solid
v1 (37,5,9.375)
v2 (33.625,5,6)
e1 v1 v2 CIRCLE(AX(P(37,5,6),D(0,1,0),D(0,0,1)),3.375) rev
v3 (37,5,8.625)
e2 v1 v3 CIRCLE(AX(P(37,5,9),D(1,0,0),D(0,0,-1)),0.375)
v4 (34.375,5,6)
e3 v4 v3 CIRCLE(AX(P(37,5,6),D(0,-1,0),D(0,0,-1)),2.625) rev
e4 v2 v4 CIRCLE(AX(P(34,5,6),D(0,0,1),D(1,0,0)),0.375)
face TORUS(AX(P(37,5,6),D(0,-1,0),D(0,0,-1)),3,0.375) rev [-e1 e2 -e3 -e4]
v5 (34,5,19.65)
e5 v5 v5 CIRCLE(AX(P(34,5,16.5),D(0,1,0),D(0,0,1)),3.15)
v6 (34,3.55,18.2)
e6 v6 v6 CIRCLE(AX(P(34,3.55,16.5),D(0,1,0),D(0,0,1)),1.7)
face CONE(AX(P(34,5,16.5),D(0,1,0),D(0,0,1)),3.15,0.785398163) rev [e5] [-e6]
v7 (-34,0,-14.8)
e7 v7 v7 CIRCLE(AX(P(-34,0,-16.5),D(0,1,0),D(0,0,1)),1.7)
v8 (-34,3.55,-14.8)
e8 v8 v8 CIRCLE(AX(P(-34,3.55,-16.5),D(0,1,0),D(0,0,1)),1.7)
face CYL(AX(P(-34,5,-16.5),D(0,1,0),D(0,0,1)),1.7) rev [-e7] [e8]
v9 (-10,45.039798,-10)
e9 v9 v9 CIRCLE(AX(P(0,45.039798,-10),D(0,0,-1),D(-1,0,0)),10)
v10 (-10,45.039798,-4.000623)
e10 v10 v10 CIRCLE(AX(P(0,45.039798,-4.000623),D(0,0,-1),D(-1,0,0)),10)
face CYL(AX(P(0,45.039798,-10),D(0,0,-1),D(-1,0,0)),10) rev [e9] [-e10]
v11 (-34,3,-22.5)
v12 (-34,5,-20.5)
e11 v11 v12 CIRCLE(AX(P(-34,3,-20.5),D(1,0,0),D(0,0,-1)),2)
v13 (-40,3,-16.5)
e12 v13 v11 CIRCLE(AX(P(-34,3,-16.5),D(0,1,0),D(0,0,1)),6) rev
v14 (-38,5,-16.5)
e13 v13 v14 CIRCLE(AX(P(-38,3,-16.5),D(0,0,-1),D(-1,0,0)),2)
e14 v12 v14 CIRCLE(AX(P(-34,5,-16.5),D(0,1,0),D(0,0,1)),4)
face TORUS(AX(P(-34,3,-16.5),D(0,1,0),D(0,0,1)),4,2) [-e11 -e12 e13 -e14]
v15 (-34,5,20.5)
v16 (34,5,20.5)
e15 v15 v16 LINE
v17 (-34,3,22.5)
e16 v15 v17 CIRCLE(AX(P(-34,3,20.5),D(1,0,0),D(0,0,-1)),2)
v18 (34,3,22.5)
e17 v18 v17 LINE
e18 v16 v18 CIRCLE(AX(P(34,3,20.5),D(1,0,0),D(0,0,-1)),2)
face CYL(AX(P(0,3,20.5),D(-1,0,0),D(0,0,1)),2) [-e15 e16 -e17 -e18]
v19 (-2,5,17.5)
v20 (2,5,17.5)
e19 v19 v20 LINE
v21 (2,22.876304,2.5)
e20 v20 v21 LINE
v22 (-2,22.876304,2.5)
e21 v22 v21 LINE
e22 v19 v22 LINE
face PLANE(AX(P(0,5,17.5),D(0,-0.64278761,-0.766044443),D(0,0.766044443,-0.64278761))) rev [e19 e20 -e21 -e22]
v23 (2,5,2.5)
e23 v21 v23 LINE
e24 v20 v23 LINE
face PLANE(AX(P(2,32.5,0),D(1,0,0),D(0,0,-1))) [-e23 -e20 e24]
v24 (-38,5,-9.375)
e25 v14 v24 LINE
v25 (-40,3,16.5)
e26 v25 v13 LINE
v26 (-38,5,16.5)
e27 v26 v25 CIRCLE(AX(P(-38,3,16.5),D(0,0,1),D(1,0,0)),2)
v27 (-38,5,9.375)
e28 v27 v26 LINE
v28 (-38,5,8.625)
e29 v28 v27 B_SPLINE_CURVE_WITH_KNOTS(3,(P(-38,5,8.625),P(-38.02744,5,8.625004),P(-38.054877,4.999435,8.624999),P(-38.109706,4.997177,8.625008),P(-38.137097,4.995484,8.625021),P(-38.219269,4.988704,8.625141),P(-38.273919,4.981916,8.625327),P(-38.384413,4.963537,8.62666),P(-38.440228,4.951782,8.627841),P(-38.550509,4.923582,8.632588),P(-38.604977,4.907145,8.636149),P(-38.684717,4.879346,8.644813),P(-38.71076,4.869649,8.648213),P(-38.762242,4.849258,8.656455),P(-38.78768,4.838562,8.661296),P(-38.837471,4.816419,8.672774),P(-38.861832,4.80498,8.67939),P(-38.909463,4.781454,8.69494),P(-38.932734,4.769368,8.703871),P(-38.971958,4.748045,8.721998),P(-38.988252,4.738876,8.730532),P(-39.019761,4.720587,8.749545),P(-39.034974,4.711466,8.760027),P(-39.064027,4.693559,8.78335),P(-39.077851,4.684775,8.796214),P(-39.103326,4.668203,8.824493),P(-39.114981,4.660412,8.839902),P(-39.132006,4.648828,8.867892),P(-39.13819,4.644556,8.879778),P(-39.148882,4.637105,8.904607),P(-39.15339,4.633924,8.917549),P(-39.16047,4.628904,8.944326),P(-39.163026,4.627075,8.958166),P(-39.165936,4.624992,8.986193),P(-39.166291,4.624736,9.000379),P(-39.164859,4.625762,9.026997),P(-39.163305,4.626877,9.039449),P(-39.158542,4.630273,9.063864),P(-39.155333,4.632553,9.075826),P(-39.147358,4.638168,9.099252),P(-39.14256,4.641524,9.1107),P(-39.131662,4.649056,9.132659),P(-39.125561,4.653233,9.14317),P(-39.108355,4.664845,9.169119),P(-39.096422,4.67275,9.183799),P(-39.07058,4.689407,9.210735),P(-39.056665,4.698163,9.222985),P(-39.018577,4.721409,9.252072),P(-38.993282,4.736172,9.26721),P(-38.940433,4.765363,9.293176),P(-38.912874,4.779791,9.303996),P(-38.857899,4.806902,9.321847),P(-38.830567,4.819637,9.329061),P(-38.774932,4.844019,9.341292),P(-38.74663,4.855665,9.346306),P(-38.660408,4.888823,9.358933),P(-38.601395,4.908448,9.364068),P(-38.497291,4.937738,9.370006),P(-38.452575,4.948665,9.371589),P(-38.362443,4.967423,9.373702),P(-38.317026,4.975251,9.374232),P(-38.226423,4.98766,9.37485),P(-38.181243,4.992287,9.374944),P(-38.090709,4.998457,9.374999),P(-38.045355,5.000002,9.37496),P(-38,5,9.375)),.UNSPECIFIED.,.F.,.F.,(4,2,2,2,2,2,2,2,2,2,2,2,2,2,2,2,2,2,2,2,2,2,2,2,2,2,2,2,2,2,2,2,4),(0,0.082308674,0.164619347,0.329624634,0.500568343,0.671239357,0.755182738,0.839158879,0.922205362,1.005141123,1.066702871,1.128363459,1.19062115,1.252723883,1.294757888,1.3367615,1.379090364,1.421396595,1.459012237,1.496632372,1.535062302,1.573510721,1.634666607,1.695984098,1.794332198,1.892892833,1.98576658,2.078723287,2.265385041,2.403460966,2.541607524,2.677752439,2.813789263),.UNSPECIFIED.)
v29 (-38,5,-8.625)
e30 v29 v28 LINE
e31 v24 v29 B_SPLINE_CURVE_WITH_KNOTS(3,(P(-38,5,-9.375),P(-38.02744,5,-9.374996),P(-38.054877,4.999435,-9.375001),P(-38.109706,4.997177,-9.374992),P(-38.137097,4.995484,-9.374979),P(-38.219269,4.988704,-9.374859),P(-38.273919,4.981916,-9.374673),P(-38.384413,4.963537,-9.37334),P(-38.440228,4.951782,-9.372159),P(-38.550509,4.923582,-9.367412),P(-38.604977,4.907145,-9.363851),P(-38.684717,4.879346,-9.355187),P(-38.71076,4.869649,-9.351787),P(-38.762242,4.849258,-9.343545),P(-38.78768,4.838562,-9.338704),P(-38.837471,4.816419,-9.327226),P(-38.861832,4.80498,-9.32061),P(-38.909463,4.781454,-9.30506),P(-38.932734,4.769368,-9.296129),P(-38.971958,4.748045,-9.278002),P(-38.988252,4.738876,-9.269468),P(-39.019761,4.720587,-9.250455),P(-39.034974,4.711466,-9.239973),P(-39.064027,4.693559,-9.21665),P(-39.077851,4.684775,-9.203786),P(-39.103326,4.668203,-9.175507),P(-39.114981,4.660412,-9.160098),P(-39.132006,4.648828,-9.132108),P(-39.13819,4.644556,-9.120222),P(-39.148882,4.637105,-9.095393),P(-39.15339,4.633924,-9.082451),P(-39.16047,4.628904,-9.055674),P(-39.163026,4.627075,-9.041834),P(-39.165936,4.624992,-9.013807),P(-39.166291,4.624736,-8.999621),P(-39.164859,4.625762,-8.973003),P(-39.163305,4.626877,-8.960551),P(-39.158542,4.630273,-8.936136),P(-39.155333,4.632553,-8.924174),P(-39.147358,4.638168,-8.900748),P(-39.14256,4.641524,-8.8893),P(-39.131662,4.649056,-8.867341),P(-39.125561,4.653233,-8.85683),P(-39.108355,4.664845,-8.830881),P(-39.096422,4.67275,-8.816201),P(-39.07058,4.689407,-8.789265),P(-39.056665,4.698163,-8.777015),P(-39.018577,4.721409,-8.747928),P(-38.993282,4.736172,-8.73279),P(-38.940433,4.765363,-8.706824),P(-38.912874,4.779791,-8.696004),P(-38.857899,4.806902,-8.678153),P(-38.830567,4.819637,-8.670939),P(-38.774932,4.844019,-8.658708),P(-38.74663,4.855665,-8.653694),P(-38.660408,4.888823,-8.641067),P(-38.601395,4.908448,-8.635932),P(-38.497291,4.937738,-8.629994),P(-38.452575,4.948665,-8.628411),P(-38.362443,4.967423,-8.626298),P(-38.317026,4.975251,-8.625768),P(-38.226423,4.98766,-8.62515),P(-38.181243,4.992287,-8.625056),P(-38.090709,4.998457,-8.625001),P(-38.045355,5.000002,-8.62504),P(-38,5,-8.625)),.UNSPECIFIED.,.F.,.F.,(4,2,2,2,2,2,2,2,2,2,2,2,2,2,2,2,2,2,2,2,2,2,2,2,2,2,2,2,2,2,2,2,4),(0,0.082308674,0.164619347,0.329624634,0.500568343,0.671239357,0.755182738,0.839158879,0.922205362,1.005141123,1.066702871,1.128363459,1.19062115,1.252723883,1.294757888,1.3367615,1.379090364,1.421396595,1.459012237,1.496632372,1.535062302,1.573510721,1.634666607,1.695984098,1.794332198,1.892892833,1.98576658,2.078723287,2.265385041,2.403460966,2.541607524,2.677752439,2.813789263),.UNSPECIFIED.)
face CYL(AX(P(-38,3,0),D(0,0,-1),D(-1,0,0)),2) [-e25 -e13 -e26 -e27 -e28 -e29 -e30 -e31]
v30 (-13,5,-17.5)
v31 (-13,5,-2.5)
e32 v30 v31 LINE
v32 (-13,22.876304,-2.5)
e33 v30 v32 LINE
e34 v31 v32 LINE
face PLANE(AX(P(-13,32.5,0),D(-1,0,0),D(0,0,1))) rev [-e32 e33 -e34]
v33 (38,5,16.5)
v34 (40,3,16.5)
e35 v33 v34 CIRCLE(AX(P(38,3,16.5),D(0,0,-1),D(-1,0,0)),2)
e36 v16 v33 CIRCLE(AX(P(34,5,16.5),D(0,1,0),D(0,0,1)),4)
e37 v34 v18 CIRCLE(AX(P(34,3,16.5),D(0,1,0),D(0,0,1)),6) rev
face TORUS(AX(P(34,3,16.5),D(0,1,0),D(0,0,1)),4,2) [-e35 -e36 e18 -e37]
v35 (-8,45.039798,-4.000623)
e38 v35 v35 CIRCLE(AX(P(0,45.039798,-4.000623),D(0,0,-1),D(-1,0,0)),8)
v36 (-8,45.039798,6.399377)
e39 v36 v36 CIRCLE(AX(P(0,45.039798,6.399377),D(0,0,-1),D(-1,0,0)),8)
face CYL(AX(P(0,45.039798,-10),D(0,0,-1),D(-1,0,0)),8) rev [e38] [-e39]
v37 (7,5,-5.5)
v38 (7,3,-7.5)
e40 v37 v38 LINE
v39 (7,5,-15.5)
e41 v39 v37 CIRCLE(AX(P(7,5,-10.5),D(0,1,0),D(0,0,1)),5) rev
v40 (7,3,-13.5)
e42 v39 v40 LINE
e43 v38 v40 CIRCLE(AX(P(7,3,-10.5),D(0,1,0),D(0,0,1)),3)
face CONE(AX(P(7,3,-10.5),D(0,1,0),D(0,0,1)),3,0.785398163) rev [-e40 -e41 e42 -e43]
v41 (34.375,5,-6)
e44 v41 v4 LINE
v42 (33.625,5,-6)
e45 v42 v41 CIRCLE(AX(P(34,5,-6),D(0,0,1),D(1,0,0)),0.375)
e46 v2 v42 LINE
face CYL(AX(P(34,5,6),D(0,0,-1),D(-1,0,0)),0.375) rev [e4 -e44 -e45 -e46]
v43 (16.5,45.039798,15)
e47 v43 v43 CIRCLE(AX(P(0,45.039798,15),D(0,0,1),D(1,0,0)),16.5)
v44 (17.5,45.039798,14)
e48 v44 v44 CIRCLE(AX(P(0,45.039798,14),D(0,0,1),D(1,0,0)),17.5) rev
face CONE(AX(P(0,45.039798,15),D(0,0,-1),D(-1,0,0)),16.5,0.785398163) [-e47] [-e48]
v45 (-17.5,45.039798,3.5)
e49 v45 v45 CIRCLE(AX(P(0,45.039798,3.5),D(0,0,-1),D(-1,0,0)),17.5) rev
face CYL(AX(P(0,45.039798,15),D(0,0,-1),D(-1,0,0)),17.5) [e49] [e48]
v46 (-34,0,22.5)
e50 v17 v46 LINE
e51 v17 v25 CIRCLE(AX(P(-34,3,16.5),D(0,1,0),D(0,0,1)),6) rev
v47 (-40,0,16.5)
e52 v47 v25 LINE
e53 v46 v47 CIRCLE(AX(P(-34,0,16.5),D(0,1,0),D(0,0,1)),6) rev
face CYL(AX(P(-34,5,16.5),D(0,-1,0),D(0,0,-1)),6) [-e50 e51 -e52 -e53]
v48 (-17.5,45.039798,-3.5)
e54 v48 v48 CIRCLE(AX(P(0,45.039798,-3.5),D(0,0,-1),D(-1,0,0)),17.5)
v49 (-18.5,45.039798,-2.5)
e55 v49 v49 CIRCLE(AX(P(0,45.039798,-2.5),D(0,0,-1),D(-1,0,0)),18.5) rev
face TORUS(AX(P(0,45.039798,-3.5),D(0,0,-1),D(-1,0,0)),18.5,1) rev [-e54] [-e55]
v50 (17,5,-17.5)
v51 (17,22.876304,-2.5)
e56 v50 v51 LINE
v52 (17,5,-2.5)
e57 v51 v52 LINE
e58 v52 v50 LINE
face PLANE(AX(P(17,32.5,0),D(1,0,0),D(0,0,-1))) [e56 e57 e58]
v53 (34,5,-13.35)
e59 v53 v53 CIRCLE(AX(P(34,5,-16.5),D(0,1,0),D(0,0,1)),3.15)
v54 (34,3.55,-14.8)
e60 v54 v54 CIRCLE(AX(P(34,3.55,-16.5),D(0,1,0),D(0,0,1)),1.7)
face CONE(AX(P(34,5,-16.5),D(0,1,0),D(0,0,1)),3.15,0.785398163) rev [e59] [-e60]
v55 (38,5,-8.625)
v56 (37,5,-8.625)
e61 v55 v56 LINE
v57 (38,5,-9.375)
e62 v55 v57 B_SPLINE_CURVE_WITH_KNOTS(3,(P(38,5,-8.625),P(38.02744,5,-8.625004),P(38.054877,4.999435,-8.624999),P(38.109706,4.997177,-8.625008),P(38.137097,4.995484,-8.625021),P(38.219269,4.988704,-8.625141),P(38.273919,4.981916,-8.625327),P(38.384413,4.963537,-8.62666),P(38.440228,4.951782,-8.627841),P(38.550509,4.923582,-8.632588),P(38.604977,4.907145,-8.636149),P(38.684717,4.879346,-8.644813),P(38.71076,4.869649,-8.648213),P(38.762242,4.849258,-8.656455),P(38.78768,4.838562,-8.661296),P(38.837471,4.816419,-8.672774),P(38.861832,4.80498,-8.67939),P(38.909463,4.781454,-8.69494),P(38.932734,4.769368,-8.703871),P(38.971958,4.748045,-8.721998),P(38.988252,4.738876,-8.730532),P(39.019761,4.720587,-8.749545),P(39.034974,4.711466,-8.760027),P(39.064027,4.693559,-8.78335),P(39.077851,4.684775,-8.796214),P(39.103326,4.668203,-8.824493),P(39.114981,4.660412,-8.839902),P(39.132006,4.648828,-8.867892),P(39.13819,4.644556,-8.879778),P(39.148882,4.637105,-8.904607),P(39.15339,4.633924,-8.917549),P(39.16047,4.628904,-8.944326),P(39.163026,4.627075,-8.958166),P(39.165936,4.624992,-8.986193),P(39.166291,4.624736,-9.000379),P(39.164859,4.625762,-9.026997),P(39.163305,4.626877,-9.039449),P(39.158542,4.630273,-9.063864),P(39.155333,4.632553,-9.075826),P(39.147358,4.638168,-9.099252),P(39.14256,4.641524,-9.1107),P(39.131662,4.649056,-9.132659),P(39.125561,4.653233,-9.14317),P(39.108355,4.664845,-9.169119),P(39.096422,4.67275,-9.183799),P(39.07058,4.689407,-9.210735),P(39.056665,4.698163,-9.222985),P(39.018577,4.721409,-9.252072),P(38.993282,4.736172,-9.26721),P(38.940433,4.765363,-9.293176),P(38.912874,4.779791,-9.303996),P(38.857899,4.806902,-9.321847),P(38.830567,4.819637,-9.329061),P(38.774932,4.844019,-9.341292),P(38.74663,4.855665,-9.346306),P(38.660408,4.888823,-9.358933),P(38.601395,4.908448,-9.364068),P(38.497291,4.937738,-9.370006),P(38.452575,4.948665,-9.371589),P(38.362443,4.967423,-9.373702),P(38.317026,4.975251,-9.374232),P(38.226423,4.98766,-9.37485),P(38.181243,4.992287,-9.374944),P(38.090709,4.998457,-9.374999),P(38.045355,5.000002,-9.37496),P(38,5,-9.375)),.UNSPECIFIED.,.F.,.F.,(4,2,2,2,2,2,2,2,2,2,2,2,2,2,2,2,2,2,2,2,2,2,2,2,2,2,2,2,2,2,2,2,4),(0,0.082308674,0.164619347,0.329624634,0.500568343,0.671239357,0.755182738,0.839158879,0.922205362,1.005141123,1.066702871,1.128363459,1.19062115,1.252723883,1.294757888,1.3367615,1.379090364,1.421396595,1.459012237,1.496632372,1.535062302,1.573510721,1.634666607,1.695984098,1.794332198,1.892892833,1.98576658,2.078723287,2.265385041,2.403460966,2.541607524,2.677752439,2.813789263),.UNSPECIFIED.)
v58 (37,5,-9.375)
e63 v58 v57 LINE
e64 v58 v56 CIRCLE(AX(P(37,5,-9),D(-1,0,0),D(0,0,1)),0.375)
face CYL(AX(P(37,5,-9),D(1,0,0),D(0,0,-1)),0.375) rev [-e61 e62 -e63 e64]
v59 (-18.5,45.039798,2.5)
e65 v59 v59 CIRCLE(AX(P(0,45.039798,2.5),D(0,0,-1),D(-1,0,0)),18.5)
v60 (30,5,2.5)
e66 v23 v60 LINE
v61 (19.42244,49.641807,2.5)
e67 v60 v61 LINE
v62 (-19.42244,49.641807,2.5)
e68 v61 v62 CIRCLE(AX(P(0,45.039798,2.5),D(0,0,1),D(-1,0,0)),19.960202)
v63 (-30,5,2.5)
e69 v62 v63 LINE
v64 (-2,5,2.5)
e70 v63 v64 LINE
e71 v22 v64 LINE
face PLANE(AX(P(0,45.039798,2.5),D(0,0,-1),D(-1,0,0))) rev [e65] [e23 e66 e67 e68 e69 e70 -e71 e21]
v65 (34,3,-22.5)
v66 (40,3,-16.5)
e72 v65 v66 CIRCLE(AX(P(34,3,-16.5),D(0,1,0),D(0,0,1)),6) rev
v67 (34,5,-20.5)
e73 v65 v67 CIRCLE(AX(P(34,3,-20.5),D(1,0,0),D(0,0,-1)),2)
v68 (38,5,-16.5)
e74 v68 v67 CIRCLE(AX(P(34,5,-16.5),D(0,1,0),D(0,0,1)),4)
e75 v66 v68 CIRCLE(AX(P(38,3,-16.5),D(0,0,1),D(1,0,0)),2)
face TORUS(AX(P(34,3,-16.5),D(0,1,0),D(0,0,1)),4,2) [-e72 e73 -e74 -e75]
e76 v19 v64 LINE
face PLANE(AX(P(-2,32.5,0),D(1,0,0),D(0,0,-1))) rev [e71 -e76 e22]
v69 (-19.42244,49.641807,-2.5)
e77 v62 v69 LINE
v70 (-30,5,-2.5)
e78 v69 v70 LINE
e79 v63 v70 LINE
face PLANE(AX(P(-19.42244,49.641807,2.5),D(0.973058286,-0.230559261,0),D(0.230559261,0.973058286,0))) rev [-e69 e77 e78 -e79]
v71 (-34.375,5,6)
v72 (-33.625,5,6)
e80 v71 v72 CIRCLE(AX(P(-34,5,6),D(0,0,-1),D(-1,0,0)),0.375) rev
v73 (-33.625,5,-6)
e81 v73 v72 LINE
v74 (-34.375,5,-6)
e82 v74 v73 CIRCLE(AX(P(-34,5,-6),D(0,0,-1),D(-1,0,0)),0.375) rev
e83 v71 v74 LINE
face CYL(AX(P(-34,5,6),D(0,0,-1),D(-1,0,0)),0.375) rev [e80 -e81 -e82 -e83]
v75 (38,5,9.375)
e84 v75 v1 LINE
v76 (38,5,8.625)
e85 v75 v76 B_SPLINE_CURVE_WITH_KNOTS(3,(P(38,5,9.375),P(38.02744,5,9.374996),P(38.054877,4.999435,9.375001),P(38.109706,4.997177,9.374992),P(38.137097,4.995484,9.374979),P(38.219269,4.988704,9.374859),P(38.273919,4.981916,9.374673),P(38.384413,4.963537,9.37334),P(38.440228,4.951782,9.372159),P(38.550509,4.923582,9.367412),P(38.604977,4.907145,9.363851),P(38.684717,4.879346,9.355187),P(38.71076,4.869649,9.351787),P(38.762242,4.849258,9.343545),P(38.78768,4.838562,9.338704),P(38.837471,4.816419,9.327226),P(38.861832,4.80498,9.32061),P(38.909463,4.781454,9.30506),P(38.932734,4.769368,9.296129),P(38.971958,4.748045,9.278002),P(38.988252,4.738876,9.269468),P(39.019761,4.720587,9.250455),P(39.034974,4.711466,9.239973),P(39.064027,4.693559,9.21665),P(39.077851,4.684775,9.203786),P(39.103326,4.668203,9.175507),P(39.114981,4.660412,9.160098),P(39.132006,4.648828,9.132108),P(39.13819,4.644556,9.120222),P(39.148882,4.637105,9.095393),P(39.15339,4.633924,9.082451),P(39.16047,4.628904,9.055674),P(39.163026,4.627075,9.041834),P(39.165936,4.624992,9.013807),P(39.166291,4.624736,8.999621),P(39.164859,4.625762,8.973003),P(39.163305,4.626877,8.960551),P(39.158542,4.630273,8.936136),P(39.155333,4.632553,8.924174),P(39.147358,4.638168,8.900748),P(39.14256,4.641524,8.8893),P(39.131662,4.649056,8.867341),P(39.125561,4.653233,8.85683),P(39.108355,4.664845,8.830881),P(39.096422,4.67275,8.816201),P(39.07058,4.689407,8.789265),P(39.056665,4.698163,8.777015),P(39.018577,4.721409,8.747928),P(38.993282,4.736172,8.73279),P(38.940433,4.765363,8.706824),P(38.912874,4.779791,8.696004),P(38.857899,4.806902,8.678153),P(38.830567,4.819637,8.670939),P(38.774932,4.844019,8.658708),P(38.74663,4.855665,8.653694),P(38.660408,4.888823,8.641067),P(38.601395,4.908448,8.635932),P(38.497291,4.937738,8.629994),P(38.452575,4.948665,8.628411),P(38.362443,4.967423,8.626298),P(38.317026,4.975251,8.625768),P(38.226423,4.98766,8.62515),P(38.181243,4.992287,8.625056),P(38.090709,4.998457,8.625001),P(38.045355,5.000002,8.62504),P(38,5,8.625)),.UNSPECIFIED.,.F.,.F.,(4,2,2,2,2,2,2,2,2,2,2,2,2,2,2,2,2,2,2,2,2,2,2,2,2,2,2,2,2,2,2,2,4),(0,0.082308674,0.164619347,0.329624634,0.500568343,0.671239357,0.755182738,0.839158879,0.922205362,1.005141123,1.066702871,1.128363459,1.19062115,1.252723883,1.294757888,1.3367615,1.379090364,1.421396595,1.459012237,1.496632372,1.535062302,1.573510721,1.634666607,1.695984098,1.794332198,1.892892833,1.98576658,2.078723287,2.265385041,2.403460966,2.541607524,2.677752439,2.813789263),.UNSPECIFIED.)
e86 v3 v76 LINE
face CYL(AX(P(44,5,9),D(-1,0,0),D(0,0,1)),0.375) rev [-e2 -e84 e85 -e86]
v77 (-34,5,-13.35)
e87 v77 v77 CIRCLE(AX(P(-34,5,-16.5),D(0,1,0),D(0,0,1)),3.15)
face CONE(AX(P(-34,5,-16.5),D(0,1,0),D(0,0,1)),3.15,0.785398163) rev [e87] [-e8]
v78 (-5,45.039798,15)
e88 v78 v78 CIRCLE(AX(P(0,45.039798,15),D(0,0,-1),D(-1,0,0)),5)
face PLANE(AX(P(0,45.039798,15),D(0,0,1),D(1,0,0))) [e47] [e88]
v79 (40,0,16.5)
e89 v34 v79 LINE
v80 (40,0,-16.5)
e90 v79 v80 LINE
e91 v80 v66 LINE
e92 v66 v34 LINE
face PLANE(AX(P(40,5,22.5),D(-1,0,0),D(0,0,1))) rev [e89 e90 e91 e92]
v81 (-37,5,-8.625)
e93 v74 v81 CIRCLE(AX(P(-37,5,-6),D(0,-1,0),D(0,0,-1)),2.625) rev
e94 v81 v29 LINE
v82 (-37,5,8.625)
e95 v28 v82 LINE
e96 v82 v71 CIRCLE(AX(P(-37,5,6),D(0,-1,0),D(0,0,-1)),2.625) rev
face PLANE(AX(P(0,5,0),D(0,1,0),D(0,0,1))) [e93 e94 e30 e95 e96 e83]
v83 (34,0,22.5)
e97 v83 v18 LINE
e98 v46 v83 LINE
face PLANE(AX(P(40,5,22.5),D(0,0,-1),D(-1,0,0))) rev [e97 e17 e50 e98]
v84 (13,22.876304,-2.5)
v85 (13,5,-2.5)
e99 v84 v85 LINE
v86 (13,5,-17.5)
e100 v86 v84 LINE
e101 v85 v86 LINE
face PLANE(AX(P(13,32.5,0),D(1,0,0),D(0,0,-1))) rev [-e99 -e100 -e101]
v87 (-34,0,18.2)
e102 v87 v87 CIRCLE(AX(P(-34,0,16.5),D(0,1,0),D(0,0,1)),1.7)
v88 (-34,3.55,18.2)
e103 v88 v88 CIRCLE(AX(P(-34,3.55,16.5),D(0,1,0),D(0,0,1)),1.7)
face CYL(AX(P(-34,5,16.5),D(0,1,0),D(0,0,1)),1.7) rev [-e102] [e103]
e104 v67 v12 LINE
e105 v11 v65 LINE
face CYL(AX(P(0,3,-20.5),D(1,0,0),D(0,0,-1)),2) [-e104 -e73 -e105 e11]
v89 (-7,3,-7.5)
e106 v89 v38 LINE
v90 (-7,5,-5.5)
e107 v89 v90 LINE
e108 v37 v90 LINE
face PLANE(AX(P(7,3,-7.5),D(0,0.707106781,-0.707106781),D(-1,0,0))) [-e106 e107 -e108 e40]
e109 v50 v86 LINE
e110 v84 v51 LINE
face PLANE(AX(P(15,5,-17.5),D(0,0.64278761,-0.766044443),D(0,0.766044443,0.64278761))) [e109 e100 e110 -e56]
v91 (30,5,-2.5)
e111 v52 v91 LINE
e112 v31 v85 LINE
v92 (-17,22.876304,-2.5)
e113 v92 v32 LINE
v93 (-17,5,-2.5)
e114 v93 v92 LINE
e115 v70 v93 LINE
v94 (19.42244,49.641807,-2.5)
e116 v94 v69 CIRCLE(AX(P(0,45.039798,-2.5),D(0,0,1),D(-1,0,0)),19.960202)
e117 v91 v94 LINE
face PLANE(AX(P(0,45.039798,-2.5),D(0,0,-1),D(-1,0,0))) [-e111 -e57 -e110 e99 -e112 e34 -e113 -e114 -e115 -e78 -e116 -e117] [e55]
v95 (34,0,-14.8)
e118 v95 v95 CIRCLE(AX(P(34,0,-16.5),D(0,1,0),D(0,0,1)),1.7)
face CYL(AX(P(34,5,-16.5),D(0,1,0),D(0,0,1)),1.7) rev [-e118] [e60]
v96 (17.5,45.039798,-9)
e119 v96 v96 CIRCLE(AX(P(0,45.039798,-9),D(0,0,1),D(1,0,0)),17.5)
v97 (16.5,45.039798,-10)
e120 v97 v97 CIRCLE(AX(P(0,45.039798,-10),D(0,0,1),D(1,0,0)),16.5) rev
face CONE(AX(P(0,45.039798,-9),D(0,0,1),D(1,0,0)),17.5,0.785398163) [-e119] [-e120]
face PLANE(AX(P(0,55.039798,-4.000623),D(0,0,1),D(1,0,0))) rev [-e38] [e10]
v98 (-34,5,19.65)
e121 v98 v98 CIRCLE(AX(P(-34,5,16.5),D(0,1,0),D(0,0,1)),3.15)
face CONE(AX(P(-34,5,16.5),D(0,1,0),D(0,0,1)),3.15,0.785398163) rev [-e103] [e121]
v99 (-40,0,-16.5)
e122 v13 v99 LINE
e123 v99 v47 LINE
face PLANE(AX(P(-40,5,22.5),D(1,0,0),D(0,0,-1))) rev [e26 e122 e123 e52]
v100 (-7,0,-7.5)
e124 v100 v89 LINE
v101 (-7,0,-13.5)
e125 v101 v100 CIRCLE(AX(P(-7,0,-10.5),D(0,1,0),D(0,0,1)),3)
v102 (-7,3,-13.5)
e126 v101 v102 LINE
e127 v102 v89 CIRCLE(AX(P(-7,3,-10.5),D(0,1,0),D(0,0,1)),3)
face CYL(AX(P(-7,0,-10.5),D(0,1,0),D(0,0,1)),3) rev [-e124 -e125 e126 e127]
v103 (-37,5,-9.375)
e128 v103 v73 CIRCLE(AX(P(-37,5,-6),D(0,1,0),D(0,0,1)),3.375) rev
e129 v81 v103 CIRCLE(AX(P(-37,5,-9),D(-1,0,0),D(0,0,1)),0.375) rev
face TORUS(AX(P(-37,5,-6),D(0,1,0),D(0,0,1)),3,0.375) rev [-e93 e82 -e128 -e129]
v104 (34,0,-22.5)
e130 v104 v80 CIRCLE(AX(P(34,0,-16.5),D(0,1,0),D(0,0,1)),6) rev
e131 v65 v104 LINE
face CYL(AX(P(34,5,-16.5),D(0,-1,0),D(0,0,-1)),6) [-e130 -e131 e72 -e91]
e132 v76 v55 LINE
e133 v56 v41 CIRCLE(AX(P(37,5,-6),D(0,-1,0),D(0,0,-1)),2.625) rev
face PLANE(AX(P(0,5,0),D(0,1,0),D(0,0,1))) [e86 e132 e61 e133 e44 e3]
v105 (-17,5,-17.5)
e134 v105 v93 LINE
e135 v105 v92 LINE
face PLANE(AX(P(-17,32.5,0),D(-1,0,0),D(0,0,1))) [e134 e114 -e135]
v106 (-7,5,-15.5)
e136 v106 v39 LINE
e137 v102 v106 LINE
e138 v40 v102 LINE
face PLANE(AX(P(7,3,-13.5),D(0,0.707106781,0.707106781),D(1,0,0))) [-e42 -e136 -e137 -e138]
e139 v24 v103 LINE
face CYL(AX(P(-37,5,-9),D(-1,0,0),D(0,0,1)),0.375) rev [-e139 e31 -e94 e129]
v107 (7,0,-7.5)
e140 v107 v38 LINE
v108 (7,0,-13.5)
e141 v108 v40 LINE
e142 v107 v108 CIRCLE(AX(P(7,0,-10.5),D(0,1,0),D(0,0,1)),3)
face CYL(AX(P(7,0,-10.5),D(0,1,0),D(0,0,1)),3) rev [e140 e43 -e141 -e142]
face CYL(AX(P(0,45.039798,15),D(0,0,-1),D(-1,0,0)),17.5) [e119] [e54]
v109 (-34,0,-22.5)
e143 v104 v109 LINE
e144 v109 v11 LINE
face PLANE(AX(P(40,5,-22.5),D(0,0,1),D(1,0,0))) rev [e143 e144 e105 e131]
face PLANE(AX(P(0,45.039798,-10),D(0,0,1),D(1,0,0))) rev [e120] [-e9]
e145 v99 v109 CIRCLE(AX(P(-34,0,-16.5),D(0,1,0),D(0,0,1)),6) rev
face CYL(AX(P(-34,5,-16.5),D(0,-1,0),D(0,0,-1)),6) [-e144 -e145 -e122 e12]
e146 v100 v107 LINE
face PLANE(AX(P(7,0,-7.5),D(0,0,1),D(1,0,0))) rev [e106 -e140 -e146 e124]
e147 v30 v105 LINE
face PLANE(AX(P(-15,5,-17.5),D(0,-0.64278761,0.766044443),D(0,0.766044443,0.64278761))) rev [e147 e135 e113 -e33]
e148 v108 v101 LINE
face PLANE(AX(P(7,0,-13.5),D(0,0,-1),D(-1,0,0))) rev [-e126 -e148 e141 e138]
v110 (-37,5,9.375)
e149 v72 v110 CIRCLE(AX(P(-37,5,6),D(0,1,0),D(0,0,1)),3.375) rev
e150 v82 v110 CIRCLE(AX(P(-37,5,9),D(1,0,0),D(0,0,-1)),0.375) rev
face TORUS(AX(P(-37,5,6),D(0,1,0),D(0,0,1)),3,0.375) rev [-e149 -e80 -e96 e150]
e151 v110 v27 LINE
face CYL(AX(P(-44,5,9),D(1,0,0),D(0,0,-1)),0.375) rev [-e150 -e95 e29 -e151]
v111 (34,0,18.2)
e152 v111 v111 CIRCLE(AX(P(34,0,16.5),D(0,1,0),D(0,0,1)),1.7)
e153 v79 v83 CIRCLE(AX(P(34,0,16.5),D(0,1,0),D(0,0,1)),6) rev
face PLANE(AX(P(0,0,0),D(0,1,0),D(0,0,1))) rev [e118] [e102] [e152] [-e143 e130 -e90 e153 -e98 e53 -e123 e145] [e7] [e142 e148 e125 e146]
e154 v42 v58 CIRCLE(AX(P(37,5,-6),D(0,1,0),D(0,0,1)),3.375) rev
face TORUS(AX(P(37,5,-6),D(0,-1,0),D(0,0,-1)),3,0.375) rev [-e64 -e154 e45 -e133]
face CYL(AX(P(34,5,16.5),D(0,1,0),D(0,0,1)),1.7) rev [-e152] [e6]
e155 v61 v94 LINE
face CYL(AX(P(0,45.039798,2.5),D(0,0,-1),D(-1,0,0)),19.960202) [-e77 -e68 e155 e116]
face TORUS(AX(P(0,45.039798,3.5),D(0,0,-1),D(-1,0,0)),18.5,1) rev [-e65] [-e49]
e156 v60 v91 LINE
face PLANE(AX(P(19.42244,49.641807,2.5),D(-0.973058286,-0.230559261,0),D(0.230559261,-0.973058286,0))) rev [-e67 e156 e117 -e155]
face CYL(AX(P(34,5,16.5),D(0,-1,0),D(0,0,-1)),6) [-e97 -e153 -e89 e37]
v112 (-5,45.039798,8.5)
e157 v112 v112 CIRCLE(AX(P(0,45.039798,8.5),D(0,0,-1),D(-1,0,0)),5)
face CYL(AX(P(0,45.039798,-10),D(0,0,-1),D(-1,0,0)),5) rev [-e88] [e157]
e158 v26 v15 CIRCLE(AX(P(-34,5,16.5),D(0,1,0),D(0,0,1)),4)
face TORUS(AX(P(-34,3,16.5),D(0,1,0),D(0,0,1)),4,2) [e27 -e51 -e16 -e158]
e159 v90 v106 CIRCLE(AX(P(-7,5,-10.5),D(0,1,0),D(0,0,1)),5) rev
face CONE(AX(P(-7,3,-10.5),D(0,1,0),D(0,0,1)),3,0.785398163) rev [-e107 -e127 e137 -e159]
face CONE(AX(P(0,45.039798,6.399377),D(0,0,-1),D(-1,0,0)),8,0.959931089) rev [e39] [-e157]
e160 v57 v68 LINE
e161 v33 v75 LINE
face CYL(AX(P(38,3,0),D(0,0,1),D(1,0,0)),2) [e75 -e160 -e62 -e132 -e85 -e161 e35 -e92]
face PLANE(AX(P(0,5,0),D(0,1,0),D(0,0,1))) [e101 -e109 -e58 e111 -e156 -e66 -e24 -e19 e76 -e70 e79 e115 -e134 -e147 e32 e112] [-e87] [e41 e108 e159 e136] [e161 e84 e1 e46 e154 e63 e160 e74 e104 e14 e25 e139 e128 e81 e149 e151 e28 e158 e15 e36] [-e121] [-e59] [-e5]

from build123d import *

# Parameters (mm, degrees)
SKETCH1_W                                           = 80
SKETCH1_H                                           = 45
BOSS_EXTRUDE1_DEPTH                                 = 5
CUT_EXTRUDE1_DEPTH                                  = 5
FILLET1_R                                           = 6
FILLET2_R                                           = 6
FILLET3_R                                           = 6
FILLET4_R                                           = 6
CUT_SWEEP1_PROFILE_R                                = 0.375
FILLET5_R                                           = 2
CSK_FOR_M3_COUNTERSUNK_FLAT_HEAD_SCREW1_D           = 3.4
CSK_FOR_M3_COUNTERSUNK_FLAT_HEAD_SCREW1_CSINK_D     = 6.3
CSK_FOR_M3_COUNTERSUNK_FLAT_HEAD_SCREW1_CSINK_ANGLE = 90
CHAMFER2_SIZE                                       = 2
BOSS_EXTRUDE2_DEPTH                                 = 2.5
SKETCH20_R                                          = 17.5
BOSS_EXTRUDE3_DEPTH                                 = 12.5
CHAMFER3_SIZE                                       = 1
FILLET6_R                                           = 1
RIB1_REACH                                          = 81.569
SKETCH21_WALL_W                                     = 184.474162132
SKETCH21_WALL_H                                     = 4
RIB2_REACH                                          = 90.07
SKETCH22_WALL_W                                     = 201.475007066
SKETCH22_WALL_H                                     = 4


with BuildPart() as part:
    # Sketch1 → Boss-Extrude1 (new body)
    with BuildSketch(Plane(origin=(0, 0, 0), x_dir=(1, 0, 0), z_dir=(0, 1, 0))):
        Rectangle(SKETCH1_W, SKETCH1_H)
    extrude(amount=BOSS_EXTRUDE1_DEPTH)

    # Sketch2 → Cut-Extrude1 (cut)
    with BuildSketch(Plane(origin=(0, 5, 0), x_dir=(1, 0, 0), z_dir=(0, 1, 0))):
        with BuildLine():
            Line((7, 7.5), (-7, 7.5))
            ThreePointArc((-7, 7.5), (-10, 10.5), (-7, 13.5))
            Line((-7, 13.5), (7, 13.5))
            ThreePointArc((7, 13.5), (10, 10.5), (7, 7.5))
        make_face()
    extrude(amount=-CUT_EXTRUDE1_DEPTH, mode=Mode.SUBTRACT)

    # Fillet1
    fillet1_edges = [part.edges().sort_by_distance(p)[0] for p in [
        (-40, 2.5, -22.5),
    ]]
    fillet(fillet1_edges, radius=FILLET1_R)

    # Fillet2
    fillet2_edges = [part.edges().sort_by_distance(p)[0] for p in [
        (-40, 2.5, 22.5),
    ]]
    fillet(fillet2_edges, radius=FILLET2_R)

    # Fillet3
    fillet3_edges = [part.edges().sort_by_distance(p)[0] for p in [
        (40, 2.5, 22.5),
    ]]
    fillet(fillet3_edges, radius=FILLET3_R)

    # Fillet4
    fillet4_edges = [part.edges().sort_by_distance(p)[0] for p in [
        (40, 2.5, -22.5),
    ]]
    fillet(fillet4_edges, radius=FILLET4_R)

    # Cut-Sweep1: sweep along a path in Sketch3
    with BuildLine(Plane(origin=(0, 5, 0), x_dir=(1, 0, 0), z_dir=(0, 1, 0))) as cut_sweep1_path:
        Line((40, -9), (37, -9))
        ThreePointArc((37, -9), (34.878679656, -8.121320344), (34, -6))
        Line((34, -6), (34, 6))
        ThreePointArc((34, 6), (34.878679656, 8.121320344), (37, 9))
        Line((37, 9), (40, 9))
    # Cut-Sweep1 profile (on start of the path) → Cut-Sweep1 (sweep, cut)
    with BuildSketch(Plane(origin=(40, 5, 9), x_dir=(0, 0, -1), z_dir=(-1, 0, 0))):
        Circle(CUT_SWEEP1_PROFILE_R)
    cut_sweep1 = sweep(path=cut_sweep1_path.line, mode=Mode.SUBTRACT)

    # Mirror1: Cut-Sweep1 across plane
    add(cut_sweep1.mirror(Plane(origin=(0, 0, 0), x_dir=(0, 0, 1), z_dir=(1, 0, 0))), mode=Mode.SUBTRACT)

    # Fillet5
    # the kernel refuses this fillet: 2 mm, written as the material it takes off along each edge
    with BuildSketch(Plane(origin=(-40, 5, -4.375), x_dir=(0, -1, 0), z_dir=(0, 0, -1)), Plane(origin=(40, 5, 4.375), x_dir=(0, -1, 0), z_dir=(0, 0, 1)), Plane(origin=(40, 5, -16.5), x_dir=(0, -1, 0), z_dir=(0, 0, 1)), Plane(origin=(-40, 5, 16.5), x_dir=(0, -1, 0), z_dir=(0, 0, -1))) as fillet5_piece_1:
        with BuildLine():
            CenterArc((FILLET5_R, -FILLET5_R), FILLET5_R, 90, 90)
            Line((0, -FILLET5_R), (0, 0))
            Line((0, 0), (FILLET5_R, 0))
        make_face()
    extrude(amount=12.125, mode=Mode.SUBTRACT)
    with BuildSketch(Plane(origin=(-34, 5, -16.5), x_dir=(-1, 0, 0), z_dir=(0, 0, 1))) as fillet5_piece_2:
        with BuildLine():
            CenterArc((6 - FILLET5_R, FILLET5_R), FILLET5_R, 270, 90)
            Line((6 - FILLET5_R, 0), (6, 0))
            Line((6, 0), (6, FILLET5_R))
        make_face()
    revolve(axis=Axis((-34, 5, -16.5), (0, -1, 0)), revolution_arc=90, mode=Mode.SUBTRACT)
    with BuildSketch(Plane(origin=(34, 5, 22.5), x_dir=(0, -1, 0), z_dir=(-1, 0, 0)), Plane(origin=(-34, 5, -22.5), x_dir=(0, -1, 0), z_dir=(1, 0, 0))) as fillet5_piece_3:
        with BuildLine():
            CenterArc((FILLET5_R, -FILLET5_R), FILLET5_R, 90, 90)
            Line((0, -FILLET5_R), (0, 0))
            Line((0, 0), (FILLET5_R, 0))
        make_face()
    extrude(amount=68, mode=Mode.SUBTRACT)
    with BuildSketch(Plane(origin=(-34, 5, 16.5), x_dir=(-1, 0, 0), z_dir=(0, 0, -1))) as fillet5_piece_4:
        with BuildLine():
            CenterArc((6 - FILLET5_R, -FILLET5_R), FILLET5_R, 0, 90)
            Line((6 - FILLET5_R, 0), (6, 0))
            Line((6, 0), (6, -FILLET5_R))
        make_face()
    revolve(axis=Axis((-34, 5, 16.5), (0, 1, 0)), revolution_arc=90, mode=Mode.SUBTRACT)
    with BuildSketch(Plane(origin=(34, 5, 16.5), x_dir=(0, 0, 1), z_dir=(-1, 0, 0))) as fillet5_piece_5:
        with BuildLine():
            CenterArc((6 - FILLET5_R, -FILLET5_R), FILLET5_R, 0, 90)
            Line((6 - FILLET5_R, 0), (6, 0))
            Line((6, 0), (6, -FILLET5_R))
        make_face()
    revolve(axis=Axis((34, 5, 16.5), (0, 1, 0)), revolution_arc=90, mode=Mode.SUBTRACT)
    with BuildSketch(Plane(origin=(34, 5, -16.5), x_dir=(1, 0, 0), z_dir=(0, 0, 1))) as fillet5_piece_6:
        with BuildLine():
            CenterArc((6 - FILLET5_R, -FILLET5_R), FILLET5_R, 0, 90)
            Line((6 - FILLET5_R, 0), (6, 0))
            Line((6, 0), (6, -FILLET5_R))
        make_face()
    revolve(axis=Axis((34, 5, -16.5), (0, 1, 0)), revolution_arc=90, mode=Mode.SUBTRACT)
    with BuildSketch(Plane(origin=(40, 5, -13.625), x_dir=(0, -1, 0), z_dir=(0, 0, 1)), Plane(origin=(-40, 5, 13.625), x_dir=(0, -1, 0), z_dir=(0, 0, -1))) as fillet5_piece_7:
        with BuildLine():
            CenterArc((FILLET5_R, -FILLET5_R), FILLET5_R, 90, 90)
            Line((0, -FILLET5_R), (0, 0))
            Line((0, 0), (FILLET5_R, 0))
        make_face()
    extrude(amount=27.25, mode=Mode.SUBTRACT)

    # CSK for M3 Countersunk Flat Head Screw1 (through all)
    with Locations(Plane(origin=(0, 5, 0), x_dir=(1, 0, 0), z_dir=(0, 1, 0))):
        with Locations((34, 16.5), (34, -16.5), (-34, -16.5), (-34, 16.5)):
            CounterSinkHole(CSK_FOR_M3_COUNTERSUNK_FLAT_HEAD_SCREW1_D / 2, CSK_FOR_M3_COUNTERSUNK_FLAT_HEAD_SCREW1_CSINK_D / 2, counter_sink_angle=CSK_FOR_M3_COUNTERSUNK_FLAT_HEAD_SCREW1_CSINK_ANGLE)

    # Chamfer2
    chamfer2_edges = [part.edges().sort_by_distance(p)[0] for p in [
        (10, 5, -10.5),
        (0, 5, -13.5),
        (-10, 5, -10.5),
        (0, 5, -7.5),
    ]]
    chamfer(chamfer2_edges, length=CHAMFER2_SIZE)

    # Sketch19 → Boss-Extrude2 (add, symmetric)
    with BuildSketch(Plane.XY):
        with BuildLine():
            Line((0, 5), (-30, 5))
            Line((-30, 5), (-19.422440363, 49.641807085))
            ThreePointArc((-19.422440363, 49.641807085), (0, 65), (19.422440363, 49.641807085))
            Line((19.422440363, 49.641807085), (30, 5))
            Line((30, 5), (0, 5))
        make_face()
    extrude(amount=BOSS_EXTRUDE2_DEPTH, both=True)

    # Sketch20 → Boss-Extrude3 (add, symmetric)
    with BuildSketch(Plane.XY.offset(2.5)):
        with Locations(Location((0, 45.039797564, 0), (0, 0, 180))):
            Circle(SKETCH20_R)
    extrude(amount=BOSS_EXTRUDE3_DEPTH, both=True)

    # Chamfer3
    chamfer3_edges = [part.edges().sort_by_distance(p)[0] for p in [
        (17.5, 45.039797564, -10),
        (17.5, 45.039797564, 15),
    ]]
    chamfer(chamfer3_edges, length=CHAMFER3_SIZE)

    # Fillet6
    fillet6_edges = [part.edges().sort_by_distance(p)[0] for p in [
        (17.5, 45.039797564, 2.5),
        (17.5, 45.039797564, -2.5),
    ]]
    fillet(fillet6_edges, radius=FILLET6_R)

    # Sketch21 wall → Rib1 (add, up to next)
    with BuildSketch(Plane(origin=(0, 13.938151944, 10), x_dir=(0, 0.766044443121, -0.642787609685), z_dir=(0, 0.642787609685, 0.766044443121)), mode=Mode.PRIVATE) as rib1_sk1:
        Rectangle(SKETCH21_WALL_W, SKETCH21_WALL_H)
    rib1_tool1 = extrude(rib1_sk1.sketch, amount=-RIB1_REACH, mode=Mode.PRIVATE) - part.part
    add(rib1_tool1.solids().sort_by_distance((0, 13.938151944, 10))[0])

    # Sketch22 wall → Rib2 (add, up to next)
    with BuildSketch(Plane(origin=(15, 13.938151944, -10), x_dir=(0, 0.766044443121, 0.642787609685), z_dir=(0, -0.642787609685, 0.766044443121)), mode=Mode.PRIVATE) as rib2_sk1:
        Rectangle(SKETCH22_WALL_W, SKETCH22_WALL_H)
    rib2_tool1 = extrude(rib2_sk1.sketch, amount=RIB2_REACH, mode=Mode.PRIVATE) - part.part
    rib2 = rib2_tool1.solids().sort_by_distance((15, 13.938151944, -10))[0]
    add(rib2)

    # Mirror2: Rib2 across plane
    add(rib2.mirror(Plane(origin=(0, 0, 0), x_dir=(0, 0, 1), z_dir=(1, 0, 0))))

    # Sketch23 → Cut-Revolve1 (revolve, cut)
    with BuildSketch(Plane(origin=(0, 0, 0), x_dir=(0, 0, -1), z_dir=(1, 0, 0)), mode=Mode.PRIVATE) as cut_revolve1_sk:
        Polygon((10, 45.039797564), (10, 55.039797564), (4.000622615, 55.039797564), (4.000622615, 53.039797564), (-6.399377385, 53.039797564), (-8.5, 50.039797564), (-15, 50.039797564), (-15, 45.039797564), align=None)
    revolve(cut_revolve1_sk.sketch.rotate(Axis((0, 45.039797564, -10), (0, 0, 1)), 90), axis=Axis((0, 45.039797564, -10), (0, 0, 1)), mode=Mode.SUBTRACT)


solid = part.part
